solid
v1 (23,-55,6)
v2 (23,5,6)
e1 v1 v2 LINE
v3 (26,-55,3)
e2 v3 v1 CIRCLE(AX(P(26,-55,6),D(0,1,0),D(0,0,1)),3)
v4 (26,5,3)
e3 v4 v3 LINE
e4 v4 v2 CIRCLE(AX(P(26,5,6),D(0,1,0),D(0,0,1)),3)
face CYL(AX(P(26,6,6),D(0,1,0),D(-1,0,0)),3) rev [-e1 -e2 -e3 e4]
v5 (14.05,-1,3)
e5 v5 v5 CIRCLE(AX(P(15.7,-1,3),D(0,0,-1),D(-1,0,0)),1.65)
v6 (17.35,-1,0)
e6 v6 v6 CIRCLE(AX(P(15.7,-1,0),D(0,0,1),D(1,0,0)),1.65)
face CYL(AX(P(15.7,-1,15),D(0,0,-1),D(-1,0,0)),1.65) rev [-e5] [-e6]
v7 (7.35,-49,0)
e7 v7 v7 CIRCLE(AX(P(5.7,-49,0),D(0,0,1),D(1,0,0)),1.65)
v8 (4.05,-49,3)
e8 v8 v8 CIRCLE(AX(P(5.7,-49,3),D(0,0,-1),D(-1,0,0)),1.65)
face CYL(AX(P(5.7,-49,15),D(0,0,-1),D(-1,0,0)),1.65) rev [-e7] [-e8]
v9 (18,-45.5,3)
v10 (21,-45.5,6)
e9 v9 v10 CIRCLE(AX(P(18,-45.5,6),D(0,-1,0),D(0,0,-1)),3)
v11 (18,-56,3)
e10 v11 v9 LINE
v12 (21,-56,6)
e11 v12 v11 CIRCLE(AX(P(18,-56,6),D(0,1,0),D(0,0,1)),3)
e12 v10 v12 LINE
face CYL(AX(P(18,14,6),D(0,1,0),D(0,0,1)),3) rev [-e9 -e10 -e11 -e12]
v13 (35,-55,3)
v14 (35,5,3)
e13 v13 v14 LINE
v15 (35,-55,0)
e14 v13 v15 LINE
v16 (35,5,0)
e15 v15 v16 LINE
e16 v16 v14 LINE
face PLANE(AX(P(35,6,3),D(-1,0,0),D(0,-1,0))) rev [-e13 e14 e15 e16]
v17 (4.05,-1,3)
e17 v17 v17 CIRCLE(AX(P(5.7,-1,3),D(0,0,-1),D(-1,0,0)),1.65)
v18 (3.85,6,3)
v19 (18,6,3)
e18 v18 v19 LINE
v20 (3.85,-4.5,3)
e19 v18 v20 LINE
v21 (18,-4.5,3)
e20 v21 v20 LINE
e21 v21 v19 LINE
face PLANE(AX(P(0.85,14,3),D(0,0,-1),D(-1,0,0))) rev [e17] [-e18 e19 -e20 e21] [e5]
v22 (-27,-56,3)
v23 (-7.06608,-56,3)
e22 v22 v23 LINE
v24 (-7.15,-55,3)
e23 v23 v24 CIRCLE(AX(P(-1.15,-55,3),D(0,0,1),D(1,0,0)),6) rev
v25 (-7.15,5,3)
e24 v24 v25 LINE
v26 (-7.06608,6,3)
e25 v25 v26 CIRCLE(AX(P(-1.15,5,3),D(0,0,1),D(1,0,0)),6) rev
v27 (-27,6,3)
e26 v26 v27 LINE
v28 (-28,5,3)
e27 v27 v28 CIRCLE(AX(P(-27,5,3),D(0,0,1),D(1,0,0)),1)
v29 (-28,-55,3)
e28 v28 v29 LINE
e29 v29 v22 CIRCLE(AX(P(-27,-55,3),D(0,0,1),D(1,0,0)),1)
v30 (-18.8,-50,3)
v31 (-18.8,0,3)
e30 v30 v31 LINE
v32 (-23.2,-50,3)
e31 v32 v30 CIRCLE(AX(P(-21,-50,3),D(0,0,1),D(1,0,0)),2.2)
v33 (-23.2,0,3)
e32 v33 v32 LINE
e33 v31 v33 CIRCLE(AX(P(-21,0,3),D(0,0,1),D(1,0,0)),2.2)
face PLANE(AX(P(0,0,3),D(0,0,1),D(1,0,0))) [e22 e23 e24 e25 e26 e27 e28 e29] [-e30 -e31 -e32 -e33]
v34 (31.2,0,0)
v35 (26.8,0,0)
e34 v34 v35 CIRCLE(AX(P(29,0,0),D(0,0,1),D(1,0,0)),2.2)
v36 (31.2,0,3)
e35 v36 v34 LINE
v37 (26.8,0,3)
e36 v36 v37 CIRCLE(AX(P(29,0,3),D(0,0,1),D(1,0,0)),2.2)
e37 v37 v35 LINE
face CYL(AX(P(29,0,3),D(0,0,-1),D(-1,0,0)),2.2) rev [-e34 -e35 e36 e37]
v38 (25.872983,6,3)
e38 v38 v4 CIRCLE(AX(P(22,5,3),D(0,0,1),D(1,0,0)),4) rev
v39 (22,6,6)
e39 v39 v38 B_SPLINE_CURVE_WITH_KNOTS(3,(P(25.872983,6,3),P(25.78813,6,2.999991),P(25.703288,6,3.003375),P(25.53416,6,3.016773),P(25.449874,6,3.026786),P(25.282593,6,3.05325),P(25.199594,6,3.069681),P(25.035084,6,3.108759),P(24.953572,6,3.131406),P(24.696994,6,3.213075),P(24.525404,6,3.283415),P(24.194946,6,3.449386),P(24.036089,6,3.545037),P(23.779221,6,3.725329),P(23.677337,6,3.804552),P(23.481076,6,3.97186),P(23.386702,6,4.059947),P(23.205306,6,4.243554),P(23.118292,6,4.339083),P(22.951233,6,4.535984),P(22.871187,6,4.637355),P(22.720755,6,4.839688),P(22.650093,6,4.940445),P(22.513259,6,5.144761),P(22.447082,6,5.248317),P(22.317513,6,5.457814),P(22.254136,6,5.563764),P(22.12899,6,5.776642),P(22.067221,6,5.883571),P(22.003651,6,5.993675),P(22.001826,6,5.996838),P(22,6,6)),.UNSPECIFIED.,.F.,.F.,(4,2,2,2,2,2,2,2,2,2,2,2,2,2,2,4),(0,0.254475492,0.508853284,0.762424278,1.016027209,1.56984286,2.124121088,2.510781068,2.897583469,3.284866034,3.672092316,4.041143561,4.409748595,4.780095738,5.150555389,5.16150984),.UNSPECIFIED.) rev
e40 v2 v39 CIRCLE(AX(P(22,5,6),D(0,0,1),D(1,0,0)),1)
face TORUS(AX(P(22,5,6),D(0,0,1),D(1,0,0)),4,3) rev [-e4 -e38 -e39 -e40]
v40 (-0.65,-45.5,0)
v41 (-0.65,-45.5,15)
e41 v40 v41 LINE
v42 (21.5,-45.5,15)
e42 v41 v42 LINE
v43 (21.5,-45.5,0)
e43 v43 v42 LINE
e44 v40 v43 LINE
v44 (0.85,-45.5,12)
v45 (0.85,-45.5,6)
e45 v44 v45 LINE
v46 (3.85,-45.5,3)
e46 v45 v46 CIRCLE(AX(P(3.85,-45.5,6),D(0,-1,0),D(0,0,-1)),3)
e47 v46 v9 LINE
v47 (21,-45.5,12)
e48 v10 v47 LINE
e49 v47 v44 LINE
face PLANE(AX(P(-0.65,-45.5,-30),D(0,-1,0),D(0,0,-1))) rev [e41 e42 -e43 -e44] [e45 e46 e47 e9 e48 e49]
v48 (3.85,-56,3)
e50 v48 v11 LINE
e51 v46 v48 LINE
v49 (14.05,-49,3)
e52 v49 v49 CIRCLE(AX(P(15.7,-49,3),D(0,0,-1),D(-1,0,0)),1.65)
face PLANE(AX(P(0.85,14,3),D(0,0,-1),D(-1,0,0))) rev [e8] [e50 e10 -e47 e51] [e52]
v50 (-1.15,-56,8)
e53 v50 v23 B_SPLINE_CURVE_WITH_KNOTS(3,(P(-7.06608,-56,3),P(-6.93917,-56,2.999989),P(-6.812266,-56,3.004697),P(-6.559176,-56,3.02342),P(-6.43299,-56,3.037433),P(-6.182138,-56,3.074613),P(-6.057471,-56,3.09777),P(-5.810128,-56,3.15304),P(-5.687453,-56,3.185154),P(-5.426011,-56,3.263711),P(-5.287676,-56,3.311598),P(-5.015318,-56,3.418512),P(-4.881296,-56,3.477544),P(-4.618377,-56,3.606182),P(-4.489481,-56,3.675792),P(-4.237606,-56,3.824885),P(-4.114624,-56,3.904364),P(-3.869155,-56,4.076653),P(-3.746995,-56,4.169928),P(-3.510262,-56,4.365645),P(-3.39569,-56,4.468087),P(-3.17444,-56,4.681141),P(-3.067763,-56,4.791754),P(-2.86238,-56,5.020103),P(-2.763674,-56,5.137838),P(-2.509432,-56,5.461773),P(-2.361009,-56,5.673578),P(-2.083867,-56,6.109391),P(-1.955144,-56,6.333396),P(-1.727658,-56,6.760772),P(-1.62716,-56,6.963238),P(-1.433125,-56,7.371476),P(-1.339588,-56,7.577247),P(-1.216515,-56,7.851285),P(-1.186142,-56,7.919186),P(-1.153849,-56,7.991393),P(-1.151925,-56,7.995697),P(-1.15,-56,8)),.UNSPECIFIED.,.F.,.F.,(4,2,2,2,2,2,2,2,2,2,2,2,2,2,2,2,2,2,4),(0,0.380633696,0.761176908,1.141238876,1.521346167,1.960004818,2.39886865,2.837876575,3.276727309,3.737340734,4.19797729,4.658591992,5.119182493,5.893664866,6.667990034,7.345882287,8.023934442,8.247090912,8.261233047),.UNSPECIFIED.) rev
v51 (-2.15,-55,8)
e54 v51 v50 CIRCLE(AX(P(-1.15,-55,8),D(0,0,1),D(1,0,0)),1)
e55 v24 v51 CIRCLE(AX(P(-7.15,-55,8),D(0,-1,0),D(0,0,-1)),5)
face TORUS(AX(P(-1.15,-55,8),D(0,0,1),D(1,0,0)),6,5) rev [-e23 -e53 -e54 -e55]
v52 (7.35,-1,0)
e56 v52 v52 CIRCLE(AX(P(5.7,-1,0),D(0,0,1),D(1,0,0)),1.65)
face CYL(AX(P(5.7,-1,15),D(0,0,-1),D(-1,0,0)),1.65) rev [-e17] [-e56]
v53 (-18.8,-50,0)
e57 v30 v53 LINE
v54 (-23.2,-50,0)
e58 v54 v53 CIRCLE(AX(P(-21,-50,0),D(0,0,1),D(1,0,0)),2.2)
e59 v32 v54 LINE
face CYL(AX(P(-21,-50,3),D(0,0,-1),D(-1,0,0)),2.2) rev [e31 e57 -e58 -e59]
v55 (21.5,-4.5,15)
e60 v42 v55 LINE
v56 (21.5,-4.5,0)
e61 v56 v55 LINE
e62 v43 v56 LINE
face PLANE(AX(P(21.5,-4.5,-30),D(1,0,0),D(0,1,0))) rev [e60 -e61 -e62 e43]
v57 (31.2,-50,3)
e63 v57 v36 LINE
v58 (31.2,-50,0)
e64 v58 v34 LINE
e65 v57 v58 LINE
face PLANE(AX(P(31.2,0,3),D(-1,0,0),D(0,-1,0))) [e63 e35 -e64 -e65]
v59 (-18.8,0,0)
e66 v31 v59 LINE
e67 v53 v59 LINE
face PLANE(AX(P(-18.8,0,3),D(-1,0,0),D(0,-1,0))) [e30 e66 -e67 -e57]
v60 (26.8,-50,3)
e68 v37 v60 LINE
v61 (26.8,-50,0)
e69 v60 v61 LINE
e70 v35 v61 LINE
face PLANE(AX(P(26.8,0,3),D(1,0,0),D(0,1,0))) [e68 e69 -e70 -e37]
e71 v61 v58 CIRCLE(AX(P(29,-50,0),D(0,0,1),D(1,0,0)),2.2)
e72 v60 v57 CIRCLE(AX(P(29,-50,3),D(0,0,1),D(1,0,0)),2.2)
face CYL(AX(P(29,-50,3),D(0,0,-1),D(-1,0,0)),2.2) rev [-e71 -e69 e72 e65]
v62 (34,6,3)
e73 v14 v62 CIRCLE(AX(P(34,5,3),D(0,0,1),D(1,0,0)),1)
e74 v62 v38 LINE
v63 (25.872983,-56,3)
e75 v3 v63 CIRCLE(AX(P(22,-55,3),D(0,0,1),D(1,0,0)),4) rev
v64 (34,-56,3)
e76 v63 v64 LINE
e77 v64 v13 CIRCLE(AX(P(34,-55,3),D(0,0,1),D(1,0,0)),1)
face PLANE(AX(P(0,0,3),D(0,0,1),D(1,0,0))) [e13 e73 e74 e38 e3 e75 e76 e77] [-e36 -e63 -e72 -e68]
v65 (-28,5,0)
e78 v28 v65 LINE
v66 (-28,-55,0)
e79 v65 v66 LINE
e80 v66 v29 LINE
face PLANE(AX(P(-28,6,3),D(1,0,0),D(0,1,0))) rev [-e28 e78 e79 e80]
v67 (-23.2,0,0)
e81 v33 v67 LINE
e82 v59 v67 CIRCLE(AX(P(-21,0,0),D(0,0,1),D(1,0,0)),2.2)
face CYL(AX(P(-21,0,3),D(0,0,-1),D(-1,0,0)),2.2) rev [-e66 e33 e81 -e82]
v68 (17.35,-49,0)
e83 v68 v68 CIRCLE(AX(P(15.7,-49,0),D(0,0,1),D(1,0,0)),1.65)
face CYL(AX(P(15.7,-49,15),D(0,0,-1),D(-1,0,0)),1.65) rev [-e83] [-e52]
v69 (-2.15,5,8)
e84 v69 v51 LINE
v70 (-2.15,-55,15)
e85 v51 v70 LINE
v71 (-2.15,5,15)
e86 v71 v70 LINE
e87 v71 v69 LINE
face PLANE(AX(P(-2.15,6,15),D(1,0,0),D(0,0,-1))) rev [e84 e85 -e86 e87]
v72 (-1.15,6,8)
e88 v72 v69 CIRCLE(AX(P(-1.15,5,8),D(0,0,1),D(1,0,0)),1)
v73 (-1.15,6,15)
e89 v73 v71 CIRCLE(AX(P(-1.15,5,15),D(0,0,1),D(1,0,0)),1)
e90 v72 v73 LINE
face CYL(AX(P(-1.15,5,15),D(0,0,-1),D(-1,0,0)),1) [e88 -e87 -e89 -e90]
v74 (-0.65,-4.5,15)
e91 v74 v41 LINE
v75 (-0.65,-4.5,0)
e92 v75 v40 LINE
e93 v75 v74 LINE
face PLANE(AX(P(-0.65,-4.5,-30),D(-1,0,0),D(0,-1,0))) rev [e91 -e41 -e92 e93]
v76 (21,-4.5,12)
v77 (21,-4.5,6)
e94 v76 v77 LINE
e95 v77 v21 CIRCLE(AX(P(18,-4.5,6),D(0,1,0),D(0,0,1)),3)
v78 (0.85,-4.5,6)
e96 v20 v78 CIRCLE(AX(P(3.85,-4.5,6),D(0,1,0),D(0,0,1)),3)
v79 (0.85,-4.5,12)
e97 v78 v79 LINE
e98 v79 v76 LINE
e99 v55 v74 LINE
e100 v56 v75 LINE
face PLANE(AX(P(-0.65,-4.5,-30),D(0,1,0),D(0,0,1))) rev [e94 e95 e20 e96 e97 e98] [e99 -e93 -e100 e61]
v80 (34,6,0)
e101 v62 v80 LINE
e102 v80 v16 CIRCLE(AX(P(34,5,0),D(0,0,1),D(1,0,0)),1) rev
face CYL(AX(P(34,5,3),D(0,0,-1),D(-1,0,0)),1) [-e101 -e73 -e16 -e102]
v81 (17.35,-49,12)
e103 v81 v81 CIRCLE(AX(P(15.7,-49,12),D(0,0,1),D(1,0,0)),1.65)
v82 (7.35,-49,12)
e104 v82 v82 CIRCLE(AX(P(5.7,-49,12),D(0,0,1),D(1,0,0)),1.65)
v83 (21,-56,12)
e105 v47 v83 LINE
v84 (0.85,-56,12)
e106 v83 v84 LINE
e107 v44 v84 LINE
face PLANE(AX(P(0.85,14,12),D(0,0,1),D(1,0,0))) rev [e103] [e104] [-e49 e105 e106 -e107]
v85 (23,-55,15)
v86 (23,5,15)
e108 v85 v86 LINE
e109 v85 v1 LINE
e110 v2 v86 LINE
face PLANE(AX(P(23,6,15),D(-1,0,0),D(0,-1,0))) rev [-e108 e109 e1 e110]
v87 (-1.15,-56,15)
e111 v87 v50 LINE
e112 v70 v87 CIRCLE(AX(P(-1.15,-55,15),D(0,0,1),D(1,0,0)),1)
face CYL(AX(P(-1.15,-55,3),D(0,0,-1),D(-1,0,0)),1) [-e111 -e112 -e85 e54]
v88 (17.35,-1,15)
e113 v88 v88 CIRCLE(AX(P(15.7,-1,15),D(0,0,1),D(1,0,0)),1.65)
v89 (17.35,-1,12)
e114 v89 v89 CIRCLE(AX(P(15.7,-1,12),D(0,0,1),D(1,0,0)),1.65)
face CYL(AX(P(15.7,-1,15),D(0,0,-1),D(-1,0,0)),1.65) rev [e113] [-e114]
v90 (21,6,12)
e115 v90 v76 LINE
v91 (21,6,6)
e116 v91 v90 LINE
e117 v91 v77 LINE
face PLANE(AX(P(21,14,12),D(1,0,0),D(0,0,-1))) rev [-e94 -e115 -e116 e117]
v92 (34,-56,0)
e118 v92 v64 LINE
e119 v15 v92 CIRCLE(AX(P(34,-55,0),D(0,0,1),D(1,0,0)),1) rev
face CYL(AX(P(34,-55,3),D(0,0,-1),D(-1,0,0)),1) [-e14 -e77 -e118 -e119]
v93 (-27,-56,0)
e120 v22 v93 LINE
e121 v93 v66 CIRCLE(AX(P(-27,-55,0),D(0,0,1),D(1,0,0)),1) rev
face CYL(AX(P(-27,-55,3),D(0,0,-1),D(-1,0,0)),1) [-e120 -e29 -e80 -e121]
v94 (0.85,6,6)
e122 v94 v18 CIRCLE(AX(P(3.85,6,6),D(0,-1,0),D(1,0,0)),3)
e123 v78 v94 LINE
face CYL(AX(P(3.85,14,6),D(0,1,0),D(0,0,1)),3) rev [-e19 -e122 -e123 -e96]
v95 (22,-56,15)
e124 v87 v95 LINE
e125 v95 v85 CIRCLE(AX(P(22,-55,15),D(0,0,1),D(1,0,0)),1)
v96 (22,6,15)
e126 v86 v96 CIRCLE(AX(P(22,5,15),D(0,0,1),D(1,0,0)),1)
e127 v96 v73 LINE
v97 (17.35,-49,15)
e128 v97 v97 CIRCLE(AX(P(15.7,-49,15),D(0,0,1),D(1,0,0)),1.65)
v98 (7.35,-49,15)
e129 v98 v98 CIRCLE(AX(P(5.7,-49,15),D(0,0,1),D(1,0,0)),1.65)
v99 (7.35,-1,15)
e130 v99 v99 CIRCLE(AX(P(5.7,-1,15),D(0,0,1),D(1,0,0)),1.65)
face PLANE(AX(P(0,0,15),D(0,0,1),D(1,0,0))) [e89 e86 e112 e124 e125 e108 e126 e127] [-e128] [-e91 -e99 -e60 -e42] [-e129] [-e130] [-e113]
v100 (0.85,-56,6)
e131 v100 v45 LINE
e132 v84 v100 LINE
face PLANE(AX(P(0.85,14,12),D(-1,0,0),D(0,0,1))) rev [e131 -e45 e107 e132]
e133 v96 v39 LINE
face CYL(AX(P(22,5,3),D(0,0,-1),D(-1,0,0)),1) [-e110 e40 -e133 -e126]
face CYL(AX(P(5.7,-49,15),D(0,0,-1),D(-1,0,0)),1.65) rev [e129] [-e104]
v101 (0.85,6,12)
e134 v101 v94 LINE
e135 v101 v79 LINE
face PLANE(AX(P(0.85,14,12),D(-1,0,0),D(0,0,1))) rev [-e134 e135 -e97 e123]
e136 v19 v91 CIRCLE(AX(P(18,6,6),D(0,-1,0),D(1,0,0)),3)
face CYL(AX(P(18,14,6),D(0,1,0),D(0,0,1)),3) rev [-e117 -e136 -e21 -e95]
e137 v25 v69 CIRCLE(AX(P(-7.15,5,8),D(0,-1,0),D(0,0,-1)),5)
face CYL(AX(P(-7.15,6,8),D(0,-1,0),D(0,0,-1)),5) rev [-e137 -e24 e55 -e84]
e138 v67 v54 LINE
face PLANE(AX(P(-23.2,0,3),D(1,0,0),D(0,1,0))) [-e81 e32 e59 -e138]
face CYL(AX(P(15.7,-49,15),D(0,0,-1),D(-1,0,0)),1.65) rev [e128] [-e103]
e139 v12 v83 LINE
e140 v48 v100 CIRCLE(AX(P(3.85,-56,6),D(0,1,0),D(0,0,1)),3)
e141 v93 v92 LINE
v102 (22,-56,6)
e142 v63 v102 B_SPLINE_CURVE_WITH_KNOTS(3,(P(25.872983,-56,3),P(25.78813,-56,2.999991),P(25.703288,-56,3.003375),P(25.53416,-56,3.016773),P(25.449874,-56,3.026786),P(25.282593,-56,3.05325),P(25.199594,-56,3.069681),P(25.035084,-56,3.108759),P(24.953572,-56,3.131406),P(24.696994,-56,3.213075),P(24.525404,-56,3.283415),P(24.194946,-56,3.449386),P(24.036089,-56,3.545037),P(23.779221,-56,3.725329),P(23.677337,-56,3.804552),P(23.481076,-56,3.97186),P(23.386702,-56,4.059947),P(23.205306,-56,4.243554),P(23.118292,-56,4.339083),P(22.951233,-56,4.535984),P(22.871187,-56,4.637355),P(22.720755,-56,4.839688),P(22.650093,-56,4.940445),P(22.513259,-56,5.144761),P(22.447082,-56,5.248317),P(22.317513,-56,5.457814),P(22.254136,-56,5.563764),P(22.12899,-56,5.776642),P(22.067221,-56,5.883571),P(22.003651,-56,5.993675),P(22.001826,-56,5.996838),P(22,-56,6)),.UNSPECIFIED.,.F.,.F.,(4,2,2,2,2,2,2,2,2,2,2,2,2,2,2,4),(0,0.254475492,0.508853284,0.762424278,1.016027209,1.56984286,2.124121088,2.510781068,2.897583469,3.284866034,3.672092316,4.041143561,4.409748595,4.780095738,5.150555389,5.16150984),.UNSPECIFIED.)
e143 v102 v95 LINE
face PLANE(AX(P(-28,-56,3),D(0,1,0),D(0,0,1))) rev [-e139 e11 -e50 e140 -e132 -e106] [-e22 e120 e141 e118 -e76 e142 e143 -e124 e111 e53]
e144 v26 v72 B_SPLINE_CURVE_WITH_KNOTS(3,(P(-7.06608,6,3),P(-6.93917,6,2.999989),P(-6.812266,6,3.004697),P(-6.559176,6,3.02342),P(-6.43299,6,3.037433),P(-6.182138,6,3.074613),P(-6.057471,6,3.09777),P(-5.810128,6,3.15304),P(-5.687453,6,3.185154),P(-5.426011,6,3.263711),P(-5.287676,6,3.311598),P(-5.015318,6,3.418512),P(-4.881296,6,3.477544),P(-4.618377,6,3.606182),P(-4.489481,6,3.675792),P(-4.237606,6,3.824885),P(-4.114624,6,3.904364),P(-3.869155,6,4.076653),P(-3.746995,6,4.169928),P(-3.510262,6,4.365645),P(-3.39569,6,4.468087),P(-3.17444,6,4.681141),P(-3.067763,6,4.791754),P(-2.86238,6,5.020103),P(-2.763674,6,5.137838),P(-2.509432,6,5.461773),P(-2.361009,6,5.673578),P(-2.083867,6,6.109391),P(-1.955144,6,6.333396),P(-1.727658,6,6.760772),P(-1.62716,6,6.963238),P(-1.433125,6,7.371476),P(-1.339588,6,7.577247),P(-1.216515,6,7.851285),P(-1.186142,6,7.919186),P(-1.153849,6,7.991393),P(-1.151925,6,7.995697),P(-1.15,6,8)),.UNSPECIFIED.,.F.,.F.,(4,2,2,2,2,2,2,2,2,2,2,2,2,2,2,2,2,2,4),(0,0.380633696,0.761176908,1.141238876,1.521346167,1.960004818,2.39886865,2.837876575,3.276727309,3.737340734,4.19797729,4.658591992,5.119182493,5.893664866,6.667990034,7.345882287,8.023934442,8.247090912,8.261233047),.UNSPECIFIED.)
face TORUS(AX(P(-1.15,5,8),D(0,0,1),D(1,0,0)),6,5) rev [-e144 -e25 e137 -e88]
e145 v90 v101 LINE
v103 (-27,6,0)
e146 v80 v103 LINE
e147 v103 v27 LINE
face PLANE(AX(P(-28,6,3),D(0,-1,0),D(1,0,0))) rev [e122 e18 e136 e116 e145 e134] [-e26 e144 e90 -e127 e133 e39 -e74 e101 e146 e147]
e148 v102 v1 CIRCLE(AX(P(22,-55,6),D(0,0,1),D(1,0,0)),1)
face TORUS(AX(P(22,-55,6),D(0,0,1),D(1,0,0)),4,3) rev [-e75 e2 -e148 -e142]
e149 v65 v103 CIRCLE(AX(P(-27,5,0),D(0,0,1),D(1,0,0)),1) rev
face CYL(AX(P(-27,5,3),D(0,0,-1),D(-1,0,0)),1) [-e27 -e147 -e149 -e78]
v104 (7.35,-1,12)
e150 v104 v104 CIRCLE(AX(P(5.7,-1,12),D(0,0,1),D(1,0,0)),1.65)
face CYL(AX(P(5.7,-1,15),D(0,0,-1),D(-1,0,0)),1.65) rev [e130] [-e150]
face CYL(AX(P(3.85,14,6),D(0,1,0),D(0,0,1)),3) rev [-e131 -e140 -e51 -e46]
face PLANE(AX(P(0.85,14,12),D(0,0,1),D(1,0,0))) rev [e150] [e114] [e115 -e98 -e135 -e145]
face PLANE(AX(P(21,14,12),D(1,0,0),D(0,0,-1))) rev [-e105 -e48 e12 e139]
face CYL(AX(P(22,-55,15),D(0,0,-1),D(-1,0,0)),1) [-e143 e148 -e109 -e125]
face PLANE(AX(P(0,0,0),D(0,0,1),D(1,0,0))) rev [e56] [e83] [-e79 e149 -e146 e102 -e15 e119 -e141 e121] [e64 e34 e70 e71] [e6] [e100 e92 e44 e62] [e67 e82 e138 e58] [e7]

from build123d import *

# Parameters (mm, degrees)
SKETCH_1_W          = 63
SKETCH_1_H          = 62
EXTRUDE_1_DEPTH     = 3
SKETCH_2_W          = 25.15
SKETCH_2_H          = 62
SKETCH_2_R          = 1.65
EXTRUDE_2_DEPTH     = 12
CUT_EXTRUDE_START   = -45
SKETCH_4_R          = 1.65
SKETCH_4_W          = 22.15
SKETCH_4_H          = 41
CUT_EXTRUDE_4_DEPTH = 45
FILLET_1_R          = 1
FILLET_2_R          = 5
SKETCH_5_W          = 20.15
SKETCH_5_H          = 9
CUT_EXTRUDE_5_DEPTH = 70
FILLET_3_R          = 3
FILLET_4_R          = 3


with BuildPart() as part:
    # 草图1 → 凸台-拉伸1 (new body)
    with BuildSketch(Plane.XY):
        with Locations((3.5, -25)):
            Rectangle(SKETCH_1_W, SKETCH_1_H)
        with BuildLine():
            Line((26.8, 0), (26.8, -50))
            ThreePointArc((26.8, -50), (29, -52.2), (31.2, -50))
            Line((31.2, -50), (31.2, 0))
            ThreePointArc((31.2, 0), (29, 2.2), (26.8, 0))
        make_face(mode=Mode.SUBTRACT)
        with BuildLine():
            Line((-23.2, 0), (-23.2, -50))
            ThreePointArc((-23.2, -50), (-21, -52.2), (-18.8, -50))
            Line((-18.8, -50), (-18.8, 0))
            ThreePointArc((-18.8, 0), (-21, 2.2), (-23.2, 0))
        make_face(mode=Mode.SUBTRACT)
    extrude(amount=EXTRUDE_1_DEPTH)

    # 草图2 → 凸台-拉伸2 (add)
    with BuildSketch(Plane.XY.offset(3)):
        with Locations((10.425, -25)):
            Rectangle(SKETCH_2_W, SKETCH_2_H)
        with Locations((5.7, -1)):
            Circle(SKETCH_2_R, mode=Mode.SUBTRACT)
        with Locations((15.7, -1)):
            Circle(SKETCH_2_R, mode=Mode.SUBTRACT)
        with Locations((15.7, -49)):
            Circle(SKETCH_2_R, mode=Mode.SUBTRACT)
        with Locations((5.7, -49)):
            Circle(SKETCH_2_R, mode=Mode.SUBTRACT)
    extrude(amount=EXTRUDE_2_DEPTH)

    # 草图4 → 切除-拉伸4 (cut)
    with BuildSketch(Plane.XY.offset(15).offset(CUT_EXTRUDE_START)):
        with Locations((5.7, -1)):
            Circle(SKETCH_4_R)
        with Locations((5.7, -49)):
            Circle(SKETCH_4_R)
        with Locations((15.7, -49)):
            Circle(SKETCH_4_R)
        with Locations((15.7, -1)):
            Circle(SKETCH_4_R)
        with Locations((10.425, -25)):
            Rectangle(SKETCH_4_W, SKETCH_4_H)
    extrude(amount=CUT_EXTRUDE_4_DEPTH, mode=Mode.SUBTRACT)

    # 圆角1
    fillet_1_edges = [part.edges().sort_by_distance(p)[0] for p in [
        (-2.15, 6, 9),
        (-2.15, -56, 9),
        (23, -56, 9),
        (23, 6, 9),
        (-28, 6, 1.5),
        (35, 6, 1.5),
        (35, -56, 1.5),
        (-28, -56, 1.5),
    ]]
    fillet(fillet_1_edges, radius=FILLET_1_R)

    # 圆角2
    # the kernel refuses this fillet: 5 mm, written as the material it adds along each edge
    with BuildSketch(Plane(origin=(-2.15, -55, 3), x_dir=(0, 0, 1), z_dir=(0, 1, 0))) as fillet_2_piece_1:
        with BuildLine():
            CenterArc((FILLET_2_R, -FILLET_2_R), FILLET_2_R, 90, 90)
            Line((0, -FILLET_2_R), (0, 0))
            Line((0, 0), (FILLET_2_R, 0))
        make_face()
    extrude(amount=60)
    with BuildSketch(Plane(origin=(-1.15, 5, 3), x_dir=(-0.9999802608561372, -0.006283143965558402, 0), z_dir=(-0.006283143965558402, 0.9999802608561372, 0))) as fillet_2_piece_2_section:
        with BuildLine():
            CenterArc((-1 - FILLET_2_R, FILLET_2_R), FILLET_2_R, 270, 90)
            Line((-1 - FILLET_2_R, 0), (-1, 0))
            Line((-1, 0), (-1, FILLET_2_R))
        make_face()
    fillet_2_piece_2 = revolve(axis=Axis((-1.15, 5, 3), (0, 0, 1)), revolution_arc=359.64, mode=Mode.PRIVATE)
    fillet_2_piece_2 = split(fillet_2_piece_2, bisect_by=Plane(origin=(-1.917475009, 6, 5.017645476), z_dir=(0, -1, 0)), keep=Keep.TOP, mode=Mode.PRIVATE)
    add(fillet_2_piece_2)
    with BuildSketch(Plane(origin=(-1.15, -55, 3), x_dir=(-0.9999802608561372, 0.006283143965561067, 0), z_dir=(-0.006283143965561067, -0.9999802608561372, 0))) as fillet_2_piece_3_section:
        with BuildLine():
            CenterArc((-1 - FILLET_2_R, -FILLET_2_R), FILLET_2_R, 0, 90)
            Line((-1 - FILLET_2_R, 0), (-1, 0))
            Line((-1, 0), (-1, -FILLET_2_R))
        make_face()
    fillet_2_piece_3 = revolve(axis=Axis((-1.15, -55, 3), (0, 0, -1)), revolution_arc=359.64, mode=Mode.PRIVATE)
    fillet_2_piece_3 = split(fillet_2_piece_3, bisect_by=Plane(origin=(-1.917475041, -56, 5.017645533), z_dir=(0, 1, 0)), keep=Keep.TOP, mode=Mode.PRIVATE)
    add(fillet_2_piece_3)

    # 草图5 → 切除-拉伸5 (cut)
    with BuildSketch(Plane(origin=(0, -56, 0), x_dir=(-1, 0, 0), z_dir=(0, -1, 0))):
        with Locations((-10.925, -7.5)):
            Rectangle(SKETCH_5_W, SKETCH_5_H)
    extrude(amount=-CUT_EXTRUDE_5_DEPTH, mode=Mode.SUBTRACT)

    # 圆角3
    fillet_3_edges = [part.edges().sort_by_distance(p)[0] for p in [
        (0.85, 0.75, 3),
        (0.85, -50.75, 3),
        (21, 0.75, 3),
        (21, -50.75, 3),
    ]]
    fillet(fillet_3_edges, radius=FILLET_3_R)

    # 圆角4
    # the kernel refuses this fillet: 3 mm, written as the material it adds along each edge
    with BuildSketch(Plane(origin=(23, 5, 3), x_dir=(1, 0, 0), z_dir=(0, -1, 0))) as fillet_4_piece_1:
        with BuildLine():
            CenterArc((FILLET_4_R, FILLET_4_R), FILLET_4_R, 180, 90)
            Line((0, FILLET_4_R), (0, 0))
            Line((0, 0), (FILLET_4_R, 0))
        make_face()
    extrude(amount=60)
    with BuildSketch(Plane(origin=(22, 5, 3), x_dir=(0.9999802608561372, -0.0062831439655584, 0), z_dir=(0.0062831439655584, 0.9999802608561372, 0))) as fillet_4_piece_2_section:
        with BuildLine():
            CenterArc((-1 - FILLET_4_R, -FILLET_4_R), FILLET_4_R, 0, 90)
            Line((-1, -FILLET_4_R), (-1, 0))
            Line((-1, 0), (-1 - FILLET_4_R, 0))
        make_face()
    fillet_4_piece_2 = revolve(axis=Axis((22, 5, 3), (0, 0, -1)), revolution_arc=359.64, mode=Mode.PRIVATE)
    fillet_4_piece_2 = split(fillet_4_piece_2, bisect_by=Plane(origin=(22.764056834, 6, 4.135633635), z_dir=(0, -1, 0)), keep=Keep.TOP, mode=Mode.PRIVATE)
    add(fillet_4_piece_2)
    with BuildSketch(Plane(origin=(22, -55, 3), x_dir=(0.9999802608561372, 0.006283143965561065, 0), z_dir=(0.006283143965561065, -0.9999802608561372, 0))) as fillet_4_piece_3_section:
        with BuildLine():
            CenterArc((-1 - FILLET_4_R, FILLET_4_R), FILLET_4_R, 270, 90)
            Line((-1 - FILLET_4_R, 0), (-1, 0))
            Line((-1, 0), (-1, FILLET_4_R))
        make_face()
    fillet_4_piece_3 = revolve(axis=Axis((22, -55, 3), (0, 0, 1)), revolution_arc=359.64, mode=Mode.PRIVATE)
    fillet_4_piece_3 = split(fillet_4_piece_3, bisect_by=Plane(origin=(22.76405677, -56, 4.135633616), z_dir=(0, 1, 0)), keep=Keep.TOP, mode=Mode.PRIVATE)
    add(fillet_4_piece_3)


solid = part.part
